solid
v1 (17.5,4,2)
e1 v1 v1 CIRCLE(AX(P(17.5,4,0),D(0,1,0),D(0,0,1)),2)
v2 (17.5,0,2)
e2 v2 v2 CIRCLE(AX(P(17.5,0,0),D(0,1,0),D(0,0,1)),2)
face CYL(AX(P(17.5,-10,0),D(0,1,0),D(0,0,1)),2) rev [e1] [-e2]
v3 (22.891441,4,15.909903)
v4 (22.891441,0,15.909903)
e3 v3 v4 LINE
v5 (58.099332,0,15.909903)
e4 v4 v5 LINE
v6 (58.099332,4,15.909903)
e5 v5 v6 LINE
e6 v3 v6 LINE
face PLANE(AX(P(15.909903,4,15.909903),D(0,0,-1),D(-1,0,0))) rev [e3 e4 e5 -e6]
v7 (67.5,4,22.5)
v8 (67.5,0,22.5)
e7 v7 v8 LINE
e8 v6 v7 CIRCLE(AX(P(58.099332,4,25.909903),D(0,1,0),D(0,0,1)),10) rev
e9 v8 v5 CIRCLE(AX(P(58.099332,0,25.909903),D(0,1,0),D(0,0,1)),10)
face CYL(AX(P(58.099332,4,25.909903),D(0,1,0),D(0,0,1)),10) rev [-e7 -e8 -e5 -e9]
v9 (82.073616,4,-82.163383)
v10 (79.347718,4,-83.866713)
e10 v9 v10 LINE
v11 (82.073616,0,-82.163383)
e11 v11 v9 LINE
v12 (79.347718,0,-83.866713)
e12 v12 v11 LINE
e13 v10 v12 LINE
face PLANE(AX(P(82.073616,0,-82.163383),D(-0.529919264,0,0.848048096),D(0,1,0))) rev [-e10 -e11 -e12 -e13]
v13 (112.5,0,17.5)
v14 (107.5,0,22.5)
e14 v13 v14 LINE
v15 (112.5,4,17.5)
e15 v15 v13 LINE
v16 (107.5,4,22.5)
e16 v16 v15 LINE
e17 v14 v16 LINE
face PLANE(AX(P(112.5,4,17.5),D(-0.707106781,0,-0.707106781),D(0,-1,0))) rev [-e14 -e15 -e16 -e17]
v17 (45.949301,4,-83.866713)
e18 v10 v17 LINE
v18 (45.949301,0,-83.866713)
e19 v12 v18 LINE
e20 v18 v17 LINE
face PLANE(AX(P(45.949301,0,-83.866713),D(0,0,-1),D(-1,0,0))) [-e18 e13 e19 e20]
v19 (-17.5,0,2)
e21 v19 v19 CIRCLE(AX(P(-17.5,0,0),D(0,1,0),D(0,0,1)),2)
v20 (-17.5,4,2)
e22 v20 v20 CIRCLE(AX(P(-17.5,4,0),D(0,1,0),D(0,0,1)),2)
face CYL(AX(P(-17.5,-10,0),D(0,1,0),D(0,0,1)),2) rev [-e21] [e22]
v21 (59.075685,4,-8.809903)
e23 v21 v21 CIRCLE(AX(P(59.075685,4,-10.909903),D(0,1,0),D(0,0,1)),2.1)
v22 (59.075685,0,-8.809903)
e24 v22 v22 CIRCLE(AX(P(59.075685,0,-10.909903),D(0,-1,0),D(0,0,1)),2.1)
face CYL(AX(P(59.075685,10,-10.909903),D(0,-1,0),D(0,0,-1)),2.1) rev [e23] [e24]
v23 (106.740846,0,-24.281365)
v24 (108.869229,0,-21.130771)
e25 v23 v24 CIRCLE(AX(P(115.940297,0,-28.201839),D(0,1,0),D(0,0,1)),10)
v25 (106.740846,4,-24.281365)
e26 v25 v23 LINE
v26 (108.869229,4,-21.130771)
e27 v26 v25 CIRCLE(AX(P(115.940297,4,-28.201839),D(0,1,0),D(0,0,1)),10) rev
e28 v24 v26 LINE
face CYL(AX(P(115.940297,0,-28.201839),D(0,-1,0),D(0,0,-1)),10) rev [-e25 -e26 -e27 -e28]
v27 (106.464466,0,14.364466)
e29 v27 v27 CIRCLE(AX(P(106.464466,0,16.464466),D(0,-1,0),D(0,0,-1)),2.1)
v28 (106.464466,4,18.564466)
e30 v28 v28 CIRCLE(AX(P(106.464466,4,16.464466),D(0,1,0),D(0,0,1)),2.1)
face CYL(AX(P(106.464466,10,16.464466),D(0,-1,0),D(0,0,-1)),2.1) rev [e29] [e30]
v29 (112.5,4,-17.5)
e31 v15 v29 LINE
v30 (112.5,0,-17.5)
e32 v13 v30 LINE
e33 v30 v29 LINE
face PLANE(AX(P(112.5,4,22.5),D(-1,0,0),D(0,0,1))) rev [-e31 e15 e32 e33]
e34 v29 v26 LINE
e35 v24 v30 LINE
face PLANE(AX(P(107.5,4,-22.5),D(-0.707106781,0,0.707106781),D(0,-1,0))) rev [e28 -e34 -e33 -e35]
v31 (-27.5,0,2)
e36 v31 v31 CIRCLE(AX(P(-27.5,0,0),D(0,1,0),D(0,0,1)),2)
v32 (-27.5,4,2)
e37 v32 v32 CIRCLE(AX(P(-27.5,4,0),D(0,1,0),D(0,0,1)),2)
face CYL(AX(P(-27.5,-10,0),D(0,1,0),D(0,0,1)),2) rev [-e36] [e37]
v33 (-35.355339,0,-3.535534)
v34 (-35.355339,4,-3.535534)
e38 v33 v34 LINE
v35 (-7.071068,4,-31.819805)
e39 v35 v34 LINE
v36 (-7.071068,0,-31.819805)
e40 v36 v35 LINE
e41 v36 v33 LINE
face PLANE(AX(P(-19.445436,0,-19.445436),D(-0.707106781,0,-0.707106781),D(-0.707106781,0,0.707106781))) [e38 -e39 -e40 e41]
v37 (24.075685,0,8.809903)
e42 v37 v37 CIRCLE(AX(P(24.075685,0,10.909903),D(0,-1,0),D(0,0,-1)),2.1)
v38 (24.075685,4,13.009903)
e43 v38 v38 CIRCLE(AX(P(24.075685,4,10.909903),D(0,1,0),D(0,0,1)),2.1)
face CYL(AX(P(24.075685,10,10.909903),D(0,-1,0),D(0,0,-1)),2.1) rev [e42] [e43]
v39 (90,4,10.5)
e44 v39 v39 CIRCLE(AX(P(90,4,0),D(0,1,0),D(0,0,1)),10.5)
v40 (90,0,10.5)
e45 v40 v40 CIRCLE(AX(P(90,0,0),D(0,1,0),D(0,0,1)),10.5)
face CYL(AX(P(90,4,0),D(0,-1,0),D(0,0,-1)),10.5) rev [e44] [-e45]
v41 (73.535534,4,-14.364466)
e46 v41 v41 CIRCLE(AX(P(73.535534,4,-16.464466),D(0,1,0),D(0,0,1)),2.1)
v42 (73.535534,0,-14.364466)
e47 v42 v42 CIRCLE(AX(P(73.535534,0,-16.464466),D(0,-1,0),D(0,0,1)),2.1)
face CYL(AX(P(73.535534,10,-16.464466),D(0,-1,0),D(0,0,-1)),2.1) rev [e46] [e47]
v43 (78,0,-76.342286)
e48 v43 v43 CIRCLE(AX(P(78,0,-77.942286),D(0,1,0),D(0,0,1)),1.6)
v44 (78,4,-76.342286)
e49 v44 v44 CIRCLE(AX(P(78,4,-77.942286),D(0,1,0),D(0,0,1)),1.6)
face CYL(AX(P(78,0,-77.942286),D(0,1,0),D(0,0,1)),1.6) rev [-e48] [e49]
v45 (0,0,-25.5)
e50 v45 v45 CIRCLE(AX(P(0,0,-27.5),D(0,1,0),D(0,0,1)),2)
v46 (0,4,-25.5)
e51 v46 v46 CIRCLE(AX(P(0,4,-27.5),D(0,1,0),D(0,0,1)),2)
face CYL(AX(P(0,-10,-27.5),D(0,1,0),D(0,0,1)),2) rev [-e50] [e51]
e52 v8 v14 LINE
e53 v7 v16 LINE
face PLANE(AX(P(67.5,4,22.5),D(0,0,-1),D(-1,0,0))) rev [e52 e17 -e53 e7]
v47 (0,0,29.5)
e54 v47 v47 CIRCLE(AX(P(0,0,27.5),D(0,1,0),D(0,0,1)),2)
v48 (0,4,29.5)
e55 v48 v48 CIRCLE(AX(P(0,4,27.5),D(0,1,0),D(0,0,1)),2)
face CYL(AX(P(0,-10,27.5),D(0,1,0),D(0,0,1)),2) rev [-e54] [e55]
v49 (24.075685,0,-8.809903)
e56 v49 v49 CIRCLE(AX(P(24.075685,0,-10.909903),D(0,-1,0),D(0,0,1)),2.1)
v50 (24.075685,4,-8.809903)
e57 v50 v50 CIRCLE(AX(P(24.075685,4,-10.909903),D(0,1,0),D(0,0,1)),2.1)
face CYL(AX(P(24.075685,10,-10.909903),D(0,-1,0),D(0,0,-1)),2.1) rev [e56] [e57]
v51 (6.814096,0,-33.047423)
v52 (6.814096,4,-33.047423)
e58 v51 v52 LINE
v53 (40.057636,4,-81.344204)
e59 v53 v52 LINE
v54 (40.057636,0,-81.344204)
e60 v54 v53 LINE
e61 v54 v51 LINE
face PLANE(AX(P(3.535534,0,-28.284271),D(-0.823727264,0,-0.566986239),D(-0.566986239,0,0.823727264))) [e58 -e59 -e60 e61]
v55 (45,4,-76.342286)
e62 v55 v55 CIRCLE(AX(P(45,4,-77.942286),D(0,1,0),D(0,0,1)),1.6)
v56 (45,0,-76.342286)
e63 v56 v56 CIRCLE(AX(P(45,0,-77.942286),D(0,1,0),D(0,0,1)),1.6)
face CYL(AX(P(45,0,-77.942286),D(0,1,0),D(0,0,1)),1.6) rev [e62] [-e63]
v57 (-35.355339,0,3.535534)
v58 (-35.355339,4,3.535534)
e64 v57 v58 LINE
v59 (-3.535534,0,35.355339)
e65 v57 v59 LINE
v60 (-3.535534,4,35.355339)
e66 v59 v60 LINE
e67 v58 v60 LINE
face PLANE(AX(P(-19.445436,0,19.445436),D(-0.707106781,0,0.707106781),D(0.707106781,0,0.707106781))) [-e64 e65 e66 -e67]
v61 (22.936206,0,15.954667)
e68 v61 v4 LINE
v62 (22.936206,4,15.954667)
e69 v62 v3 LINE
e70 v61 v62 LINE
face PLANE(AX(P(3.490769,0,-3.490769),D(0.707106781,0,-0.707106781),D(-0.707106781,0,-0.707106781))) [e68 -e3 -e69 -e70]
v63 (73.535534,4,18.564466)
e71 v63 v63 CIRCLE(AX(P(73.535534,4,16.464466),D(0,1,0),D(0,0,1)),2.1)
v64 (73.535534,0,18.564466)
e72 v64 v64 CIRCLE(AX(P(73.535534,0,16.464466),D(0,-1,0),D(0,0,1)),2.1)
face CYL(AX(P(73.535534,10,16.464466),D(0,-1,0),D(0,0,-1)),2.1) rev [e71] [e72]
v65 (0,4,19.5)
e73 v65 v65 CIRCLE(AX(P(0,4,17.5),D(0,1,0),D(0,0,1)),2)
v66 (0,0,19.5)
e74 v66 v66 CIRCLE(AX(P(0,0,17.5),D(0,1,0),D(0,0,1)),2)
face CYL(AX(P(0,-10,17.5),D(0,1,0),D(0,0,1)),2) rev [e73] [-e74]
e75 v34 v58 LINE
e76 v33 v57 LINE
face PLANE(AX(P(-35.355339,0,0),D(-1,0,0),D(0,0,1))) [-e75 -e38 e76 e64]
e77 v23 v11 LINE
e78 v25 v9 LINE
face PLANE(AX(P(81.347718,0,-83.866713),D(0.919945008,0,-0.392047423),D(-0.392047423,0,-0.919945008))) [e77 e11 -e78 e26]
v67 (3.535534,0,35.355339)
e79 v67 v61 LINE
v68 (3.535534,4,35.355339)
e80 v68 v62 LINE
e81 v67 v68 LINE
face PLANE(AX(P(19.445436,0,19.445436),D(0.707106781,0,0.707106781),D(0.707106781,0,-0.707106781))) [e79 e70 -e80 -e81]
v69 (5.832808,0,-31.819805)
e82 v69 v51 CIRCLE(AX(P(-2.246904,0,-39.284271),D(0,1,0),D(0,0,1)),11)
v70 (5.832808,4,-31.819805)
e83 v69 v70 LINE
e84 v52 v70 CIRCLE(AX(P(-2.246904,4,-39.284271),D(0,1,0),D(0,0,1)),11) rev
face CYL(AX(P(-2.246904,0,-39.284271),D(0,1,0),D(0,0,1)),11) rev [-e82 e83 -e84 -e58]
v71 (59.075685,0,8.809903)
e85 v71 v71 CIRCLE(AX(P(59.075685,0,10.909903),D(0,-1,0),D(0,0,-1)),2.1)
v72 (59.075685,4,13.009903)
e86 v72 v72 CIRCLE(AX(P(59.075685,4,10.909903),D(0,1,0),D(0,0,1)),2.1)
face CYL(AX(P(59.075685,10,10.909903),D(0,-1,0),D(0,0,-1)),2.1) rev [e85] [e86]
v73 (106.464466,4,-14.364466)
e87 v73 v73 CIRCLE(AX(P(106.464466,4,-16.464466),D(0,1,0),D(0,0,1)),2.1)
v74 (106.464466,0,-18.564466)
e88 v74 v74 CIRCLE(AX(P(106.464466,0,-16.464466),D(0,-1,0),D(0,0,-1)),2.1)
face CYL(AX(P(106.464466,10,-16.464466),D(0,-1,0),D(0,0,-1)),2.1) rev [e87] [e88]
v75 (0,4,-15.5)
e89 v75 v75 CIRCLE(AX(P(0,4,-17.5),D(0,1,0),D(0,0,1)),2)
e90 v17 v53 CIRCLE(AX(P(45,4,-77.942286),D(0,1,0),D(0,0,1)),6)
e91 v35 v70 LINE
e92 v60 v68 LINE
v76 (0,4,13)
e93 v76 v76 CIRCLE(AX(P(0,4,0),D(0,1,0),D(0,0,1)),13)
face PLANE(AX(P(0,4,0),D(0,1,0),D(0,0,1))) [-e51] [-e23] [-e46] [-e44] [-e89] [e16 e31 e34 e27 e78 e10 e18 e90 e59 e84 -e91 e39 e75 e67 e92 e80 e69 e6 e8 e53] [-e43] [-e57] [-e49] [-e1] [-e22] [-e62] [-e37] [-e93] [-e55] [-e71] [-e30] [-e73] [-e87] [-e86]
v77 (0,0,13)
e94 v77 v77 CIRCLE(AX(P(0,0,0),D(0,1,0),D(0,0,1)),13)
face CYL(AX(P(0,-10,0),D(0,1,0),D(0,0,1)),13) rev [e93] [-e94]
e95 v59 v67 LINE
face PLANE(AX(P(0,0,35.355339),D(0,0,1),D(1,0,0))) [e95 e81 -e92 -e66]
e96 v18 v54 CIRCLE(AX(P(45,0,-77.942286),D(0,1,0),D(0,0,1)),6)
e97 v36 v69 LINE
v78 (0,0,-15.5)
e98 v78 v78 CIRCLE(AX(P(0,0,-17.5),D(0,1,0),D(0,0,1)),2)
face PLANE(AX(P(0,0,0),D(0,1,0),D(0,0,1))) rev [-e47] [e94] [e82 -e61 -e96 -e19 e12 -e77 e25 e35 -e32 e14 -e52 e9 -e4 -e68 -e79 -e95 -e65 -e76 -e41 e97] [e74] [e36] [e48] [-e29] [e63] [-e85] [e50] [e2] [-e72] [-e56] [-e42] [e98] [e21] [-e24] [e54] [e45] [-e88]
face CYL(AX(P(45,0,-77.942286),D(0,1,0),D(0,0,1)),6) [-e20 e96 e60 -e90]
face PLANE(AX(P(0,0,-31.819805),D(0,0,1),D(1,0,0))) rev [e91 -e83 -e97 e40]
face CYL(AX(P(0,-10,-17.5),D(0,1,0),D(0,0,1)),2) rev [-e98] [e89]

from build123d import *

# Parameters (mm, degrees)
SKETCH_1_R          = 2.1
SKETCH_1_R_2        = 10.5
SKETCH_1_R_3        = 10
EXTRUDE_1_DEPTH     = 4
CHAMFER_1_SIZE      = 5
FILLET_1_R          = 10
SKETCH_2_R          = 2.1
CUT_EXTRUDE_1_DEPTH = 10
EXTRUDE_START       = -4
SKETCH_3_R          = 1.6
EXTRUDE_2_DEPTH     = 4
FILLET_2_R          = 3
FILLET_3_R          = 11
SKETCH_4_R          = 1.6
EXTRUDE_3_DEPTH     = 4
FILLET_4_R          = 10
CHAMFER_2_SIZE      = 2
CHAMFER_2_SIZE2     = 1.851556395
FILLET_5_R          = 10
SKETCH_5_R          = 11.237062383
EXTRUDE_4_DEPTH     = 4
EXTRUDE_5_DEPTH     = 14
SKETCH_7_R          = 13
EXTRUDE_6_DEPTH     = 14
EXTRUDE_7_DEPTH     = 14
EXTRUDE_8_DEPTH     = 4


with BuildPart() as part:
    # 草图1 → 凸台-拉伸1 (new body)
    with BuildSketch(Plane(origin=(0, 0, 0), x_dir=(1, 0, 0), z_dir=(0, 1, 0))):
        Polygon((0, 31.819805153), (-31.819805153, 0), (0, -31.819805153), (15.909902577, -15.909902577), (67.5, -15.909902577), (67.5, -22.5), (112.5, -22.5), (112.5, 22.5), (67.5, 22.5), (67.5, 15.909902577), (15.909902577, 15.909902577), align=None)
        with Locations(Location((0, 14, 0), (0, 0, 270))):
            Circle(SKETCH_1_R, mode=Mode.SUBTRACT)
        with Locations(Location((14, 0, 0), (0, 0, 270))):
            Circle(SKETCH_1_R, mode=Mode.SUBTRACT)
        with Locations(Location((0, -14, 0), (0, 0, 270))):
            Circle(SKETCH_1_R, mode=Mode.SUBTRACT)
        with Locations(Location((-14, 0, 0), (0, 0, 270))):
            Circle(SKETCH_1_R, mode=Mode.SUBTRACT)
        with Locations(Location((90, 0, 0), (0, 0, 270))):
            Circle(SKETCH_1_R_2, mode=Mode.SUBTRACT)
        with Locations(Location((0, 22.5, 0), (0, 0, 270))):
            Circle(SKETCH_1_R, mode=Mode.SUBTRACT)
        with Locations(Location((0, -22.5, 0), (0, 0, 270))):
            Circle(SKETCH_1_R, mode=Mode.SUBTRACT)
        with Locations(Location((0, 0, 0), (0, 0, 270))):
            Circle(SKETCH_1_R_3, mode=Mode.SUBTRACT)
        with Locations(Location((-22.5, 0, 0), (0, 0, 270))):
            Circle(SKETCH_1_R, mode=Mode.SUBTRACT)
    extrude(amount=EXTRUDE_1_DEPTH)

    # 倒角1
    chamfer_1_edges = [part.edges().sort_by_distance(p)[0] for p in [
        (112.5, 2, -22.5),
        (112.5, 2, 22.5),
        (0, 2, 31.819805153),
        (-31.819805153, 2, 0),
        (0, 2, -31.819805153),
    ]]
    chamfer(chamfer_1_edges, length=CHAMFER_1_SIZE)

    # 圆角1
    # the kernel refuses this fillet: 10 mm, written as the material it adds along each edge
    with BuildSketch(Plane(origin=(15.909902577, 0, -15.909902577), x_dir=(-0.707106781186552, 0, -0.707106781186543), z_dir=(0, 1, 0))) as fillet_1_piece_1:
        with BuildLine():
            CenterArc((FILLET_1_R * 0.414213562373, -FILLET_1_R), FILLET_1_R, 90, 45)
            Line((-FILLET_1_R * 0.292893218813, -FILLET_1_R * 0.292893218813), (-FILLET_1_R * 0.307035354437, -FILLET_1_R * 0.27875108319))
            Line((-FILLET_1_R * 0.307035354437, -FILLET_1_R * 0.27875108319), (-FILLET_1_R * 0.00828427124746, FILLET_1_R * 0.02))
            Line((-FILLET_1_R * 0.00828427124746, FILLET_1_R * 0.02), (FILLET_1_R * 0.414213562373, FILLET_1_R * 0.02))
            Line((FILLET_1_R * 0.414213562373, FILLET_1_R * 0.02), (FILLET_1_R * 0.414213562373, 0))
        make_face()
    extrude(amount=4)
    with BuildSketch(Plane(origin=(15.909902577, 0, 15.909902577), x_dir=(-0.7071067811865422, 0, 0.707106781186553), z_dir=(0, 1, 0))) as fillet_1_piece_2:
        with BuildLine():
            CenterArc((FILLET_1_R * 0.414213562373, FILLET_1_R), FILLET_1_R, 225, 45)
            Line((-FILLET_1_R * 0.292893218813, FILLET_1_R * 0.292893218813), (-FILLET_1_R * 0.307035354437, FILLET_1_R * 0.27875108319))
            Line((-FILLET_1_R * 0.307035354437, FILLET_1_R * 0.27875108319), (-FILLET_1_R * 0.00828427124746, -FILLET_1_R * 0.02))
            Line((-FILLET_1_R * 0.00828427124746, -FILLET_1_R * 0.02), (FILLET_1_R * 0.414213562373, -FILLET_1_R * 0.02))
            Line((FILLET_1_R * 0.414213562373, -FILLET_1_R * 0.02), (FILLET_1_R * 0.414213562373, 0))
        make_face()
    extrude(amount=4)
    with BuildSketch(Plane(origin=(67.5, 0, 15.909902577), x_dir=(-1, 0, 0), z_dir=(0, 1, 0))) as fillet_1_piece_3:
        with BuildLine():
            CenterArc((9.400668296, 10), FILLET_1_R, 199.937217397, 70.062782603)
            Line((0, 6.590097423), (-0.188013366, 6.521899372))
            ThreePointArc((-0.188013366, 6.521899372), (-0.2, 3.295048712), (-0.2, 0))
            Line((-0.2, 0), (0, -0.2))
            Line((0, -0.2), (9.400668296, -0.2))
            Line((9.400668296, -0.2), (9.400668296, 0))
        make_face()
    extrude(amount=4)
    with BuildSketch(Plane(origin=(67.5, 0, -15.909902577), x_dir=(-1, 0, 0), z_dir=(0, 1, 0))) as fillet_1_piece_4:
        with BuildLine():
            CenterArc((9.400668296, -10), FILLET_1_R, 90, 70.062782603)
            Line((0, -6.590097423), (-0.188013366, -6.521899372))
            ThreePointArc((-0.188013366, -6.521899372), (-0.2, -3.295048712), (-0.2, 0))
            Line((-0.2, 0), (0, 0.2))
            Line((0, 0.2), (9.400668296, 0.2))
            Line((9.400668296, 0.2), (9.400668296, 0))
        make_face()
    extrude(amount=4)

    # 草图2 → 切除-拉伸1 (cut)
    with BuildSketch(Plane.XZ):
        with Locations(Location((106.464466094, 16.464466094, 0), (0, 0, 270))):
            Circle(SKETCH_2_R)
        with Locations(Location((106.464466094, -16.464466094, 0), (0, 0, 270))):
            Circle(SKETCH_2_R)
        with Locations(Location((73.535533906, -16.464466094, 0), (0, 0, 90))):
            Circle(SKETCH_2_R)
        with Locations(Location((73.535533906, 16.464466094, 0), (0, 0, 90))):
            Circle(SKETCH_2_R)
        with Locations(Location((24.075684952, 10.909902577, 0), (0, 0, 270))):
            Circle(SKETCH_2_R)
        with Locations(Location((59.075684952, 10.909902577, 0), (0, 0, 270))):
            Circle(SKETCH_2_R)
        with Locations(Location((59.075684952, -10.909902577, 0), (0, 0, 90))):
            Circle(SKETCH_2_R)
        with Locations(Location((24.075684952, -10.909902577, 0), (0, 0, 90))):
            Circle(SKETCH_2_R)
    extrude(amount=-CUT_EXTRUDE_1_DEPTH, mode=Mode.SUBTRACT)

    # 草图3 → 凸台-拉伸2 (add)
    with BuildSketch(Plane(origin=(0, 4, 0), x_dir=(1, 0, 0), z_dir=(0, 1, 0)).offset(EXTRUDE_START)):
        with BuildLine():
            Line((3.535533906, 28.284271247), (40.057636417, 81.344203773))
            ThreePointArc((40.057636417, 81.344203773), (45.94930127, 83.86671265), (50.75784592, 79.629654221))
            Line((50.75784592, 79.629654221), (67.5, 22.5))
            ThreePointArc((67.5, 22.5), (63.839583189, 17.721525883), (58.099331704, 15.909902577))
            Line((58.099331704, 15.909902577), (20.0520382, 15.909902577))
            ThreePointArc((20.0520382, 15.909902577), (16.225203877, 16.671107252), (12.980970389, 18.838834765))
            Line((12.980970389, 18.838834765), (3.535533906, 28.284271247))
        make_face()
        with Locations(Location((45, 77.942286341, 0), (0, 0, 270))):
            Circle(SKETCH_3_R, mode=Mode.SUBTRACT)
        Polygon((16.491758356, 29.470182421), (43.526560522, 68.746803428), (56.080145943, 25.909902577), (20.0520382, 25.909902577), align=None, mode=Mode.SUBTRACT)
    extrude(amount=EXTRUDE_2_DEPTH)

    # 圆角2
    fillet_2_edges = [part.edges().sort_by_distance(p)[0] for p in [
        (16.491758356, 2, -29.470182421),
        (43.526560522, 2, -68.746803428),
        (56.080145943, 2, -25.909902577),
        (20.0520382, 2, -25.909902577),
    ]]
    fillet(fillet_2_edges, radius=FILLET_2_R)

    # 圆角3
    fillet_3_edges = [part.edges().sort_by_distance(p)[0] for p in [
        (67.5, 2, -22.5),
        (3.535533906, 2, -28.284271247),
    ]]
    fillet(fillet_3_edges, radius=FILLET_3_R)

    # 草图4 → 凸台-拉伸3 (add)
    with BuildSketch(Plane(origin=(0, 4, 0), x_dir=(1, 0, 0), z_dir=(0, 1, 0)).offset(EXTRUDE_START)):
        with BuildLine():
            Line((45.94930127, 83.86671265), (81.347717681, 83.86671265))
            Line((81.347717681, 83.86671265), (107.5, 22.5))
            Line((107.5, 22.5), (97.716806526, 22.5))
            Line((97.716806526, 22.5), (75.4, 74.86671265))
            Line((75.4, 74.86671265), (52.153651701, 74.86671265))
            Line((52.153651701, 74.86671265), (50.75784592, 79.629654221))
            ThreePointArc((50.75784592, 79.629654221), (48.966689034, 82.443994695), (45.94930127, 83.86671265))
        make_face()
        with Locations(Location((78, 77.942286341, 0), (0, 0, 270))):
            Circle(SKETCH_4_R, mode=Mode.SUBTRACT)
    extrude(amount=EXTRUDE_3_DEPTH)

    # 圆角4
    fillet_4_edges = [part.edges().sort_by_distance(p)[0] for p in [
        (97.716806526, 2, -22.5),
        (75.4, 2, -74.86671265),
        (52.153651701, 2, -74.86671265),
    ]]
    fillet(fillet_4_edges, radius=FILLET_4_R)

    # 倒角2
    chamfer_2_edges = [part.edges().sort_by_distance(p)[0] for p in [
        (81.347717681, 2, -83.86671265),
    ]]
    chamfer_2_side = [part.faces().sort_by_distance(p)[0] for p in [
        (63.648509476, 2, -83.86671265),
    ]]
    chamfer(chamfer_2_edges, length=CHAMFER_2_SIZE, length2=CHAMFER_2_SIZE2, reference=chamfer_2_side[0])

    # 圆角5
    fillet_5_edges = [part.edges().sort_by_distance(p)[0] for p in [
        (107.5, 2, -22.5),
    ]]
    fillet(fillet_5_edges, radius=FILLET_5_R)

    # 草图5 → 凸台-拉伸4 (add)
    with BuildSketch(Plane(origin=(0, 4, 0), x_dir=(1, 0, 0), z_dir=(0, 1, 0))):
        Polygon((5.832808457, 31.819805153), (-7.071067812, 31.819805153), (-35.355339059, 3.535533906), (-35.355339059, -3.535533906), (-3.535533906, -35.355339059), (3.535533906, -35.355339059), (22.936205659, -15.954667306), (16.526788584, -9.545250231), (26.5976855, 0.525646685), align=None)
        Circle(SKETCH_5_R, mode=Mode.SUBTRACT)
    extrude(amount=-EXTRUDE_4_DEPTH)


with BuildPart() as body_2:
    # 草图6 → 凸台-拉伸5 (new body)
    with BuildSketch(Plane(origin=(0, 4, 0), x_dir=(1, 0, 0), z_dir=(0, 1, 0))):
        with BuildLine():
            ThreePointArc((2, 27.5), (1.414213562, 28.914213562), (0, 29.5))
            Line((0, 29.5), (0, 25.5))
            ThreePointArc((0, 25.5), (1.414213562, 26.085786438), (2, 27.5))
        make_face()
        with BuildLine():
            Line((0, 25.5), (0, 29.5))
            ThreePointArc((0, 29.5), (-2, 27.5), (0, 25.5))
        make_face()
        with BuildLine():
            ThreePointArc((-29.5, 0), (-27.5, -2), (-25.5, 0))
            Line((-25.5, 0), (-29.5, 0))
        make_face()
        with BuildLine():
            Line((-29.5, 0), (-25.5, 0))
            ThreePointArc((-25.5, 0), (-27.5, 2), (-29.5, 0))
        make_face()
        with BuildLine():
            ThreePointArc((2, -27.5), (1.414213562, -26.085786438), (0, -25.5))
            Line((0, -25.5), (0, -29.5))
            ThreePointArc((0, -29.5), (1.414213562, -28.914213562), (2, -27.5))
        make_face()
        with BuildLine():
            Line((0, -29.5), (0, -25.5))
            ThreePointArc((0, -25.5), (-2, -27.5), (0, -29.5))
        make_face()
    extrude(amount=-EXTRUDE_5_DEPTH)


with BuildPart() as part_1:
    add(part.part)

    # Combine 1: cut body 2
    add(body_2.part, mode=Mode.SUBTRACT)


with BuildPart() as body_2_2:
    # 草图7 → 凸台-拉伸6 (new body)
    with BuildSketch(Plane(origin=(0, 4, 0), x_dir=(1, 0, 0), z_dir=(0, 1, 0))):
        with Locations(Location((0, 0, 0), (0, 0, 270))):
            Circle(SKETCH_7_R)
    extrude(amount=-EXTRUDE_6_DEPTH)


with BuildPart() as part_2:
    add(part_1.part)

    # Combine 2: cut body 2 2
    add(body_2_2.part, mode=Mode.SUBTRACT)


with BuildPart() as body_2_3:
    # 草图9 → 凸台-拉伸7 (new body)
    with BuildSketch(Plane(origin=(0, 4, 0), x_dir=(1, 0, 0), z_dir=(0, 1, 0))):
        with BuildLine():
            ThreePointArc((2, 17.5), (1.414213562, 18.914213562), (0, 19.5))
            Line((0, 19.5), (0, 15.5))
            ThreePointArc((0, 15.5), (1.414213562, 16.085786438), (2, 17.5))
        make_face()
        with BuildLine():
            Line((0, 15.5), (0, 19.5))
            ThreePointArc((0, 19.5), (-2, 17.5), (0, 15.5))
        make_face()
        with BuildLine():
            ThreePointArc((-19.5, 0), (-17.5, -2), (-15.5, 0))
            Line((-15.5, 0), (-19.5, 0))
        make_face()
        with BuildLine():
            Line((-19.5, 0), (-15.5, 0))
            ThreePointArc((-15.5, 0), (-17.5, 2), (-19.5, 0))
        make_face()
        with BuildLine():
            ThreePointArc((19.5, 0), (17.5, 2), (15.5, 0))
            Line((15.5, 0), (19.5, 0))
        make_face()
        with BuildLine():
            Line((19.5, 0), (15.5, 0))
            ThreePointArc((15.5, 0), (17.5, -2), (19.5, 0))
        make_face()
        with BuildLine():
            ThreePointArc((2, -17.5), (1.414213562, -16.085786438), (0, -15.5))
            Line((0, -15.5), (0, -19.5))
            ThreePointArc((0, -19.5), (1.414213562, -18.914213562), (2, -17.5))
        make_face()
        with BuildLine():
            Line((0, -19.5), (0, -15.5))
            ThreePointArc((0, -15.5), (-2, -17.5), (0, -19.5))
        make_face()
    extrude(amount=-EXTRUDE_7_DEPTH)


with BuildPart() as part_3:
    add(part_2.part)

    # Combine 3: cut body 2 3
    add(body_2_3.part, mode=Mode.SUBTRACT)

    # 草图10 → 凸台-拉伸8 (add)
    with BuildSketch(Plane(origin=(0, 4, 0), x_dir=(1, 0, 0), z_dir=(0, 1, 0))):
        Polygon((38.788036592, 70.617275828), (7.35342379, 23.562877905), (103.706674861, 21.100966292), (80.486560921, 74.925699017), (61.534006424, 75.40995371), align=None)
    extrude(amount=-EXTRUDE_8_DEPTH)


solid = part_3.part
